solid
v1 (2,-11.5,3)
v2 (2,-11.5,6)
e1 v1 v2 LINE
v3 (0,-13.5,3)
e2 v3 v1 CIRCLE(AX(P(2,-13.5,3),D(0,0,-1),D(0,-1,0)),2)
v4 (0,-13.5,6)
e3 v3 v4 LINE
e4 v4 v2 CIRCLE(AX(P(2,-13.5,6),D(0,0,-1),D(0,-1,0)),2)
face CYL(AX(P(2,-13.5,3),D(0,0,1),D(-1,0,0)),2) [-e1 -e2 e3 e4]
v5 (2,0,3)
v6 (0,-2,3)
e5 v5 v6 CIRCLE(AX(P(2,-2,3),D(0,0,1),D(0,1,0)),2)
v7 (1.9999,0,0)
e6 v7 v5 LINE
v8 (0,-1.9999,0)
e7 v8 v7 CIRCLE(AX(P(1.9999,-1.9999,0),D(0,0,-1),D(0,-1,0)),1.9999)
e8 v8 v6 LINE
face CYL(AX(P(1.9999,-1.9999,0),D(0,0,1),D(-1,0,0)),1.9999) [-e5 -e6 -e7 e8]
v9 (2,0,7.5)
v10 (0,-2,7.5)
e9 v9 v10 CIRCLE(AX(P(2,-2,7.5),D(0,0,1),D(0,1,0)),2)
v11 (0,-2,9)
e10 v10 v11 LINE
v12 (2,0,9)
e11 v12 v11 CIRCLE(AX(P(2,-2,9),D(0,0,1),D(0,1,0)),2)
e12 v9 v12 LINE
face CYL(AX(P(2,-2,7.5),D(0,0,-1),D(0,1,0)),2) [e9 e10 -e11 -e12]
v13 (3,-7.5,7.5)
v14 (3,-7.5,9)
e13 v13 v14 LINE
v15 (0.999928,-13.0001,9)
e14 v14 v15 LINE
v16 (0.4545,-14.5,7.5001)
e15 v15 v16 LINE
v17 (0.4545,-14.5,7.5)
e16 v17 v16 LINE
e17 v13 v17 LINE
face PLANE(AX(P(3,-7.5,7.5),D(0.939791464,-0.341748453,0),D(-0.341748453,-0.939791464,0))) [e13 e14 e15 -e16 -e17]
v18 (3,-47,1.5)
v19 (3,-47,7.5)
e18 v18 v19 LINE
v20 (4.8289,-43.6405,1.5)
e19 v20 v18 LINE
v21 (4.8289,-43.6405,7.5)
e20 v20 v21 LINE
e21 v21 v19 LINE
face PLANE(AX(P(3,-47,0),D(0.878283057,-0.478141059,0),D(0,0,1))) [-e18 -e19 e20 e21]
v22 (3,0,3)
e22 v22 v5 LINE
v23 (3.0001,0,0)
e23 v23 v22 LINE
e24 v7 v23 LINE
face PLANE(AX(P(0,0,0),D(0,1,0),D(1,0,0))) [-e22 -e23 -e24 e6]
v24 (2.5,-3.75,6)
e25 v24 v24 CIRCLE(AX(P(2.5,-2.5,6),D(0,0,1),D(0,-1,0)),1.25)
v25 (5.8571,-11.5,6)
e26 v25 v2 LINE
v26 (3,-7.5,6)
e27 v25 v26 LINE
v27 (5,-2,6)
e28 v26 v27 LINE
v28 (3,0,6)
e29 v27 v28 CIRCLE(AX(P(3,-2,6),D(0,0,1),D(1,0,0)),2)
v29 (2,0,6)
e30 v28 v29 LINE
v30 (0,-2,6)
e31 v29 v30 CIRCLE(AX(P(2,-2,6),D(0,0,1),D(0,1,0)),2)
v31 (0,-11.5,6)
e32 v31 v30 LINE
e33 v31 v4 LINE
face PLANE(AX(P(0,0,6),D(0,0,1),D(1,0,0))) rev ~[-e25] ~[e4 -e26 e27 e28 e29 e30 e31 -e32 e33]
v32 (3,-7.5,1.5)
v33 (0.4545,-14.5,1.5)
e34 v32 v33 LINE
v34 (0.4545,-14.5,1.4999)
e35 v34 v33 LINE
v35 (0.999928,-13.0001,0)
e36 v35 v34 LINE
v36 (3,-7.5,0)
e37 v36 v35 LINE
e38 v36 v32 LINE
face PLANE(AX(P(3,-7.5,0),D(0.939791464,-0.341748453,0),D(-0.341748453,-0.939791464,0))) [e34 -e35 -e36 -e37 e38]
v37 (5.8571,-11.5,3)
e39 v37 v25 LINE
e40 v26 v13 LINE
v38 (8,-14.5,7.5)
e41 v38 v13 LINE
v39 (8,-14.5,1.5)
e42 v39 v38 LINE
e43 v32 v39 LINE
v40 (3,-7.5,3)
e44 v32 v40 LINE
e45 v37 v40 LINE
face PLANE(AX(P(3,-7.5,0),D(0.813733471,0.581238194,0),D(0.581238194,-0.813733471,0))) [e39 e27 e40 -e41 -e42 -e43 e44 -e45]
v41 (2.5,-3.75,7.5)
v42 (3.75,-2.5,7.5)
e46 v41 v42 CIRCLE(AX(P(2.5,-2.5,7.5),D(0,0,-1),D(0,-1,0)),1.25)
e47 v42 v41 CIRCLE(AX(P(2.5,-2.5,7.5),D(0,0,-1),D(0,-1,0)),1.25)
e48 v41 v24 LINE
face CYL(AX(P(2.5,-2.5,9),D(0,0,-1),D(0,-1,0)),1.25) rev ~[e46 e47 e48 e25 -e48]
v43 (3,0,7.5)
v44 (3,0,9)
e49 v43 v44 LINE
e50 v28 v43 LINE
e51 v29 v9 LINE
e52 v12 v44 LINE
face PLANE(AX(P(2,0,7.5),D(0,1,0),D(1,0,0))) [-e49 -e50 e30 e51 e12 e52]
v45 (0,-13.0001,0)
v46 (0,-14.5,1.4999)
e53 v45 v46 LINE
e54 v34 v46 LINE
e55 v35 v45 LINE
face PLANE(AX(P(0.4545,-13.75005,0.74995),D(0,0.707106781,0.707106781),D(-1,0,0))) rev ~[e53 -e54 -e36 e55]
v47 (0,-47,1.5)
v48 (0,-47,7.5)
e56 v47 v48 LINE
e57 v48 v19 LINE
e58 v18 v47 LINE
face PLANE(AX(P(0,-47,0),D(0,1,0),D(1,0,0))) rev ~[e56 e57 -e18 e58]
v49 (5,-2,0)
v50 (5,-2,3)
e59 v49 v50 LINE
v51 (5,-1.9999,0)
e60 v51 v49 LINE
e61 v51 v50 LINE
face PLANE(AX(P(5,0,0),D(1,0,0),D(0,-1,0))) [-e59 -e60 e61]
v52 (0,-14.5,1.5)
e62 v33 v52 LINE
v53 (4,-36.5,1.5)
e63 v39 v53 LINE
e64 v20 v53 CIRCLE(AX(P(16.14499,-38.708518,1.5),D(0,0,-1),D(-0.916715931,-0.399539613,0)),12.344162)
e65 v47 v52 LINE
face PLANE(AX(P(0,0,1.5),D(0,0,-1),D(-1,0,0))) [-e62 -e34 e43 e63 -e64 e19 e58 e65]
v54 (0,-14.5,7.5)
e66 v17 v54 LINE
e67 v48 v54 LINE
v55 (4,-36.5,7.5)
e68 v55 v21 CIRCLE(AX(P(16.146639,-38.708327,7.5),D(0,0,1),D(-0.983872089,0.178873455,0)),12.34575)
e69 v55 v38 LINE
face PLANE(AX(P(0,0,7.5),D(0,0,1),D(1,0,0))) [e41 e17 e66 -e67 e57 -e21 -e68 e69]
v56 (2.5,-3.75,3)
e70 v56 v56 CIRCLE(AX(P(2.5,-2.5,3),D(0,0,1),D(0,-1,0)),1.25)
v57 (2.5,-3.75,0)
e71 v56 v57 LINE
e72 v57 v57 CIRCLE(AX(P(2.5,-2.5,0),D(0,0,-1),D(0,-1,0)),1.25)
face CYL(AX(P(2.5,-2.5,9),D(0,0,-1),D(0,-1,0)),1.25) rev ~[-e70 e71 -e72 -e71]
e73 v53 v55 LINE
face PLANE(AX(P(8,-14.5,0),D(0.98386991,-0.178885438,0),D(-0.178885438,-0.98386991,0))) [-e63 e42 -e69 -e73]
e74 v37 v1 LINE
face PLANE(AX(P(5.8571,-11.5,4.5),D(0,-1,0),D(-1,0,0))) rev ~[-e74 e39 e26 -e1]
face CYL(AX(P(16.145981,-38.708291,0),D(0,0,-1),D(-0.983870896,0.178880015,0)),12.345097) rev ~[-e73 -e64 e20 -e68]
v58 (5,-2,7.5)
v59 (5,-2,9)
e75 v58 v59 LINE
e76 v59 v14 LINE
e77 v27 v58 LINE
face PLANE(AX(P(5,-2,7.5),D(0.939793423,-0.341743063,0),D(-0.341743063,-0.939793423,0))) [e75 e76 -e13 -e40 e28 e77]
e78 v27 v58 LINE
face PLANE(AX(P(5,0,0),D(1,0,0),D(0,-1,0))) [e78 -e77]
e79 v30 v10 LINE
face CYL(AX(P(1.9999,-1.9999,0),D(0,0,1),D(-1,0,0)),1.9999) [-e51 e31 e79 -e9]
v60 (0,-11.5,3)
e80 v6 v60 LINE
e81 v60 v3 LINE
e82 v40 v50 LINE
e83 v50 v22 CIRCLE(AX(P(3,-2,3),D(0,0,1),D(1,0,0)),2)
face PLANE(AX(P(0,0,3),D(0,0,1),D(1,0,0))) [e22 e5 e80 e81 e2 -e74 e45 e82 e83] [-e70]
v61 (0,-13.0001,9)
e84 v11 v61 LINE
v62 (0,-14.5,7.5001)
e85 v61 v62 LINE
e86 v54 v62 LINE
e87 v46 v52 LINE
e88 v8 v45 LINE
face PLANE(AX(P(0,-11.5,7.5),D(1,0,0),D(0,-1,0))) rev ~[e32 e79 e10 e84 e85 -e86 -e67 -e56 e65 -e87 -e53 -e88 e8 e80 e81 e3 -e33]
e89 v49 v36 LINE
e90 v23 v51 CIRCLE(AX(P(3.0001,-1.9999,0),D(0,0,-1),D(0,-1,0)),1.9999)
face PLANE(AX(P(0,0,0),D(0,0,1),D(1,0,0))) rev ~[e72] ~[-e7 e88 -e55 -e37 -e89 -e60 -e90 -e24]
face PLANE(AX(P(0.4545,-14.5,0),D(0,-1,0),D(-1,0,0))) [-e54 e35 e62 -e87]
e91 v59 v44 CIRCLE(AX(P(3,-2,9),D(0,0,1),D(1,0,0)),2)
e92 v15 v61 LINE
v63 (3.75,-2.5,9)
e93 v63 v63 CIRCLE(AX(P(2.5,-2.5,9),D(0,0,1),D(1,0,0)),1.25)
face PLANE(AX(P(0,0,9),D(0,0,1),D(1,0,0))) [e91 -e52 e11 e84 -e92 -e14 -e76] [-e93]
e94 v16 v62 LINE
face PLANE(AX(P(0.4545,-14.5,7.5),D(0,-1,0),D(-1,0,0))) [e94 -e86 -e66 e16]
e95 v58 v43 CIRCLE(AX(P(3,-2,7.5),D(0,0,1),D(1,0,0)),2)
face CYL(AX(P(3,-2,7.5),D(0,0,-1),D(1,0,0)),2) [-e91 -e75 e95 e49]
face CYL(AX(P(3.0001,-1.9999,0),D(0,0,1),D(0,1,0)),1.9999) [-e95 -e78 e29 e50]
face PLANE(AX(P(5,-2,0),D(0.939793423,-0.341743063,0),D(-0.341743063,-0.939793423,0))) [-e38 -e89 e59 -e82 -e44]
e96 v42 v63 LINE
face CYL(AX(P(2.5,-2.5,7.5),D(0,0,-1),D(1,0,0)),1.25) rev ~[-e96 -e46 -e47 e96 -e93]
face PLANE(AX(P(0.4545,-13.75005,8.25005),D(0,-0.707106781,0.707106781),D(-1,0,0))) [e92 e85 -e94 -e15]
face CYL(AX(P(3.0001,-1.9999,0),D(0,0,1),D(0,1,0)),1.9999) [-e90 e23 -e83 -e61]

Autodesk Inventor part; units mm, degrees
ref_plane "YZ Plane" through (0, 0, 0) normal (1, 0, 0) x (0, 1, 0)
ref_plane "XZ Plane" through (0, 0, 0) normal (0, 1, 0) x (-1, 0, 0)
sketch "Base" plane through (0, 0, 0) normal (0, 0, 1) x (1, 0, 0)
  line L0 (0, 0) -> (0, -47)
  line L1 (0, 0) -> (5, 0)
  line L2 (5, 0) -> (5, -2)
  line L3 (3, -7.5) -> (8, -14.5)
  line L4 (8, -14.5) -> (4, -36.5)
  arc A0 (4, -36.5) -> (7, -47) centre (16.1458, -38.7083) ccw
  line L5 (0, -47) -> (7, -47)
  line L6 (5, -2) -> (3, -7.5)
  dimension "d0" = 47
  dimension "d1" = 5
  dimension "d6" = 22
  dimension "d10" = 4
  dimension "d51" = 3
  dimension "d52" = 8
  dimension "d53" = 5.5
  dimension "d54" = 2
  dimension "d55" = 7
  dimension "d112" = 7
extrude "BaseFeature" add sketch "Base" along normal blind 9
chamfer "EndChamferFeature" distance 4 angle 45 1 edges at (7, -47, 4.5)
sketch "MountHole" plane through (0, 0, 9) normal (0, 0, 1) x (1, 0, 0)
  circle A0 centre (2.5, -2.5) radius 1.25
  line L0 (5, 0) -> (0, 0) construction
  line L1 (0, 0) -> (0, -47) construction
  dimension "d40" = 2.5
  dimension "d41" = 2.5
  dimension "d42" = 2.5
hole "MountHoleFeature" at (2.5, -2.5, 9) direction (0, 0, -1) diameter 2.5 end through all
fillet "EndFilletsFeature" radius 2 2 edges at (0, 0, 4.5) (5, 0, 4.5)
ref_plane "MidPlane" through (0, 0, 4.5) normal (0, 0, 1) x (1, 0, 0)
sketch "MountCut" plane through (0, 0, 4.5) normal (0, 0, 1) x (1, 0, 0)
  line L0 (4.8289, -43.6405) -> (3, -47) projected
  arc A0 (4, -36.5) -> (4.8289, -43.6405) centre (16.1458, -38.7083) ccw projected
  line L1 (4, -36.5) -> (8, -14.5) projected
  line L2 (8, -14.5) -> (3, -7.5) projected
  line L3 (3, -7.5) -> (5, -2) projected
  arc A1 (5, -2) -> (3, 0) centre (3, -2) ccw projected
  line L4 (3, 0) -> (2, 0) projected
  arc A2 (2, 0) -> (0, -2) centre (2, -2) ccw projected
  line L5 (0, -2) -> (0, -47) projected
  circle A3 centre (2.5, -2.5) radius 1.25 projected
  line L6 (3, -7.5) -> (0, -7.5)
  line L7 (8, -14.5) -> (3, -7.5) projected
  line L8 (5.8571, -11.5) -> (0, -11.5)
  line L9 (0, -2) -> (0, -47) projected
  line L10 (0, -47) -> (3, -47) projected
  point P0 (0, -39.1407)
  dimension "d81" = 4
extrude "MountCutFeature" cut sketch "MountCut" along normal mid plane 3 contours L5 L6 L2 L8 | L5 A2 L4 A1 L3 L6
sketch "LeftTrim" plane through (0, 0, 9) normal (0, 0, 1) x (1, 0, 0)
  line L0 (4.8289, -43.6405) -> (3, -47) projected
  arc A0 (4, -36.5) -> (4.8289, -43.6405) centre (16.1458, -38.7083) ccw projected
  line L1 (4, -36.5) -> (8, -14.5) projected
  line L2 (8, -14.5) -> (3, -7.5) projected
  line L3 (3, -7.5) -> (5, -2) projected
  arc A1 (5, -2) -> (3, 0) centre (3, -2) ccw projected
  line L4 (3, 0) -> (2, 0) projected
  arc A2 (2, 0) -> (0, -2) centre (2, -2) ccw projected
  line L5 (0, -2) -> (0, -47) projected
  circle A3 centre (2.5, -2.5) radius 1.25 projected
  line L6 (3, -7.5) -> (-0.5, -7.5)
  line L7 (0, -47) -> (3, -47) projected
extrude "LeftTrimFeature" cut sketch "LeftTrim" against normal blind 1.5 contours L0 L7 L5 L6 L2 L1 A0 | L5 A2 L4 A1 L3 L6 | A3
sketch "LeftReinforce" plane through (0, 0, 7.5) normal (0, 0, 1) x (1, 0, 0)
  circle A0 centre (2.5, -2.5) radius 1.25 projected
  line L0 (0, -11.5) -> (0, -2) construction
  line L1 (5.8571, -11.5) -> (0, -11.5) construction
  line L2 (3, -7.5) -> (5.8571, -11.5) construction
  line L3 (5, -2) -> (3, -7.5) projected
  arc A1 (5, -2) -> (3, 0) centre (3, -2) ccw projected
  line L4 (2, 0) -> (3, 0) projected
  arc A2 (2, 0) -> (0, -2) centre (2, -2) ccw projected
  line L5 (0, -11.5) -> (0, -2)
  line L6 (0, -11.5) -> (0, -14.5)
  line L7 (3, -7.5) -> (0.4545, -14.5)
  line L8 (0.4545, -14.5) -> (0, -14.5)
  line L9 (0.4545, -14.5) -> (8, -14.5) construction
extrude "LeftReinforceFeature" add sketch "LeftReinforce" along normal blind 1.5
sketch "RightTrim" plane through (0, 0, 0) normal (0, 0, -1) x (-1, 0, 0)
  line L0 (0, -47) -> (0, -14.5) projected
  line L1 (-4.8289, -43.6405) -> (-3, -47) projected
  arc A0 (-4.8289, -43.6405) -> (-4, -36.5) centre (-16.1458, -38.7083) ccw projected
  line L2 (-8, -14.5) -> (-4, -36.5) projected
  line L3 (-3, -7.5) -> (-8, -14.5) projected
  line L4 (-3, -7.5) -> (-0.4545, -14.5) projected
  line L5 (-0.4545, -14.5) -> (0, -14.5) projected
  line L6 (-3, -47) -> (0, -47) projected
extrude "RightTrimFeature" cut sketch "RightTrim" against normal blind 1.5
chamfer "MountSideChamfersFeature" distance 1.5 angle 45 2 edges at (0.2273, -14.5, 9) (0.2273, -14.5, 0)
fillet "MiddleCutBottomFilletFeature" radius 2 1 edges at (0, -11.5, 4.5)
properties part number "ProximalPhalangeIndex2"
